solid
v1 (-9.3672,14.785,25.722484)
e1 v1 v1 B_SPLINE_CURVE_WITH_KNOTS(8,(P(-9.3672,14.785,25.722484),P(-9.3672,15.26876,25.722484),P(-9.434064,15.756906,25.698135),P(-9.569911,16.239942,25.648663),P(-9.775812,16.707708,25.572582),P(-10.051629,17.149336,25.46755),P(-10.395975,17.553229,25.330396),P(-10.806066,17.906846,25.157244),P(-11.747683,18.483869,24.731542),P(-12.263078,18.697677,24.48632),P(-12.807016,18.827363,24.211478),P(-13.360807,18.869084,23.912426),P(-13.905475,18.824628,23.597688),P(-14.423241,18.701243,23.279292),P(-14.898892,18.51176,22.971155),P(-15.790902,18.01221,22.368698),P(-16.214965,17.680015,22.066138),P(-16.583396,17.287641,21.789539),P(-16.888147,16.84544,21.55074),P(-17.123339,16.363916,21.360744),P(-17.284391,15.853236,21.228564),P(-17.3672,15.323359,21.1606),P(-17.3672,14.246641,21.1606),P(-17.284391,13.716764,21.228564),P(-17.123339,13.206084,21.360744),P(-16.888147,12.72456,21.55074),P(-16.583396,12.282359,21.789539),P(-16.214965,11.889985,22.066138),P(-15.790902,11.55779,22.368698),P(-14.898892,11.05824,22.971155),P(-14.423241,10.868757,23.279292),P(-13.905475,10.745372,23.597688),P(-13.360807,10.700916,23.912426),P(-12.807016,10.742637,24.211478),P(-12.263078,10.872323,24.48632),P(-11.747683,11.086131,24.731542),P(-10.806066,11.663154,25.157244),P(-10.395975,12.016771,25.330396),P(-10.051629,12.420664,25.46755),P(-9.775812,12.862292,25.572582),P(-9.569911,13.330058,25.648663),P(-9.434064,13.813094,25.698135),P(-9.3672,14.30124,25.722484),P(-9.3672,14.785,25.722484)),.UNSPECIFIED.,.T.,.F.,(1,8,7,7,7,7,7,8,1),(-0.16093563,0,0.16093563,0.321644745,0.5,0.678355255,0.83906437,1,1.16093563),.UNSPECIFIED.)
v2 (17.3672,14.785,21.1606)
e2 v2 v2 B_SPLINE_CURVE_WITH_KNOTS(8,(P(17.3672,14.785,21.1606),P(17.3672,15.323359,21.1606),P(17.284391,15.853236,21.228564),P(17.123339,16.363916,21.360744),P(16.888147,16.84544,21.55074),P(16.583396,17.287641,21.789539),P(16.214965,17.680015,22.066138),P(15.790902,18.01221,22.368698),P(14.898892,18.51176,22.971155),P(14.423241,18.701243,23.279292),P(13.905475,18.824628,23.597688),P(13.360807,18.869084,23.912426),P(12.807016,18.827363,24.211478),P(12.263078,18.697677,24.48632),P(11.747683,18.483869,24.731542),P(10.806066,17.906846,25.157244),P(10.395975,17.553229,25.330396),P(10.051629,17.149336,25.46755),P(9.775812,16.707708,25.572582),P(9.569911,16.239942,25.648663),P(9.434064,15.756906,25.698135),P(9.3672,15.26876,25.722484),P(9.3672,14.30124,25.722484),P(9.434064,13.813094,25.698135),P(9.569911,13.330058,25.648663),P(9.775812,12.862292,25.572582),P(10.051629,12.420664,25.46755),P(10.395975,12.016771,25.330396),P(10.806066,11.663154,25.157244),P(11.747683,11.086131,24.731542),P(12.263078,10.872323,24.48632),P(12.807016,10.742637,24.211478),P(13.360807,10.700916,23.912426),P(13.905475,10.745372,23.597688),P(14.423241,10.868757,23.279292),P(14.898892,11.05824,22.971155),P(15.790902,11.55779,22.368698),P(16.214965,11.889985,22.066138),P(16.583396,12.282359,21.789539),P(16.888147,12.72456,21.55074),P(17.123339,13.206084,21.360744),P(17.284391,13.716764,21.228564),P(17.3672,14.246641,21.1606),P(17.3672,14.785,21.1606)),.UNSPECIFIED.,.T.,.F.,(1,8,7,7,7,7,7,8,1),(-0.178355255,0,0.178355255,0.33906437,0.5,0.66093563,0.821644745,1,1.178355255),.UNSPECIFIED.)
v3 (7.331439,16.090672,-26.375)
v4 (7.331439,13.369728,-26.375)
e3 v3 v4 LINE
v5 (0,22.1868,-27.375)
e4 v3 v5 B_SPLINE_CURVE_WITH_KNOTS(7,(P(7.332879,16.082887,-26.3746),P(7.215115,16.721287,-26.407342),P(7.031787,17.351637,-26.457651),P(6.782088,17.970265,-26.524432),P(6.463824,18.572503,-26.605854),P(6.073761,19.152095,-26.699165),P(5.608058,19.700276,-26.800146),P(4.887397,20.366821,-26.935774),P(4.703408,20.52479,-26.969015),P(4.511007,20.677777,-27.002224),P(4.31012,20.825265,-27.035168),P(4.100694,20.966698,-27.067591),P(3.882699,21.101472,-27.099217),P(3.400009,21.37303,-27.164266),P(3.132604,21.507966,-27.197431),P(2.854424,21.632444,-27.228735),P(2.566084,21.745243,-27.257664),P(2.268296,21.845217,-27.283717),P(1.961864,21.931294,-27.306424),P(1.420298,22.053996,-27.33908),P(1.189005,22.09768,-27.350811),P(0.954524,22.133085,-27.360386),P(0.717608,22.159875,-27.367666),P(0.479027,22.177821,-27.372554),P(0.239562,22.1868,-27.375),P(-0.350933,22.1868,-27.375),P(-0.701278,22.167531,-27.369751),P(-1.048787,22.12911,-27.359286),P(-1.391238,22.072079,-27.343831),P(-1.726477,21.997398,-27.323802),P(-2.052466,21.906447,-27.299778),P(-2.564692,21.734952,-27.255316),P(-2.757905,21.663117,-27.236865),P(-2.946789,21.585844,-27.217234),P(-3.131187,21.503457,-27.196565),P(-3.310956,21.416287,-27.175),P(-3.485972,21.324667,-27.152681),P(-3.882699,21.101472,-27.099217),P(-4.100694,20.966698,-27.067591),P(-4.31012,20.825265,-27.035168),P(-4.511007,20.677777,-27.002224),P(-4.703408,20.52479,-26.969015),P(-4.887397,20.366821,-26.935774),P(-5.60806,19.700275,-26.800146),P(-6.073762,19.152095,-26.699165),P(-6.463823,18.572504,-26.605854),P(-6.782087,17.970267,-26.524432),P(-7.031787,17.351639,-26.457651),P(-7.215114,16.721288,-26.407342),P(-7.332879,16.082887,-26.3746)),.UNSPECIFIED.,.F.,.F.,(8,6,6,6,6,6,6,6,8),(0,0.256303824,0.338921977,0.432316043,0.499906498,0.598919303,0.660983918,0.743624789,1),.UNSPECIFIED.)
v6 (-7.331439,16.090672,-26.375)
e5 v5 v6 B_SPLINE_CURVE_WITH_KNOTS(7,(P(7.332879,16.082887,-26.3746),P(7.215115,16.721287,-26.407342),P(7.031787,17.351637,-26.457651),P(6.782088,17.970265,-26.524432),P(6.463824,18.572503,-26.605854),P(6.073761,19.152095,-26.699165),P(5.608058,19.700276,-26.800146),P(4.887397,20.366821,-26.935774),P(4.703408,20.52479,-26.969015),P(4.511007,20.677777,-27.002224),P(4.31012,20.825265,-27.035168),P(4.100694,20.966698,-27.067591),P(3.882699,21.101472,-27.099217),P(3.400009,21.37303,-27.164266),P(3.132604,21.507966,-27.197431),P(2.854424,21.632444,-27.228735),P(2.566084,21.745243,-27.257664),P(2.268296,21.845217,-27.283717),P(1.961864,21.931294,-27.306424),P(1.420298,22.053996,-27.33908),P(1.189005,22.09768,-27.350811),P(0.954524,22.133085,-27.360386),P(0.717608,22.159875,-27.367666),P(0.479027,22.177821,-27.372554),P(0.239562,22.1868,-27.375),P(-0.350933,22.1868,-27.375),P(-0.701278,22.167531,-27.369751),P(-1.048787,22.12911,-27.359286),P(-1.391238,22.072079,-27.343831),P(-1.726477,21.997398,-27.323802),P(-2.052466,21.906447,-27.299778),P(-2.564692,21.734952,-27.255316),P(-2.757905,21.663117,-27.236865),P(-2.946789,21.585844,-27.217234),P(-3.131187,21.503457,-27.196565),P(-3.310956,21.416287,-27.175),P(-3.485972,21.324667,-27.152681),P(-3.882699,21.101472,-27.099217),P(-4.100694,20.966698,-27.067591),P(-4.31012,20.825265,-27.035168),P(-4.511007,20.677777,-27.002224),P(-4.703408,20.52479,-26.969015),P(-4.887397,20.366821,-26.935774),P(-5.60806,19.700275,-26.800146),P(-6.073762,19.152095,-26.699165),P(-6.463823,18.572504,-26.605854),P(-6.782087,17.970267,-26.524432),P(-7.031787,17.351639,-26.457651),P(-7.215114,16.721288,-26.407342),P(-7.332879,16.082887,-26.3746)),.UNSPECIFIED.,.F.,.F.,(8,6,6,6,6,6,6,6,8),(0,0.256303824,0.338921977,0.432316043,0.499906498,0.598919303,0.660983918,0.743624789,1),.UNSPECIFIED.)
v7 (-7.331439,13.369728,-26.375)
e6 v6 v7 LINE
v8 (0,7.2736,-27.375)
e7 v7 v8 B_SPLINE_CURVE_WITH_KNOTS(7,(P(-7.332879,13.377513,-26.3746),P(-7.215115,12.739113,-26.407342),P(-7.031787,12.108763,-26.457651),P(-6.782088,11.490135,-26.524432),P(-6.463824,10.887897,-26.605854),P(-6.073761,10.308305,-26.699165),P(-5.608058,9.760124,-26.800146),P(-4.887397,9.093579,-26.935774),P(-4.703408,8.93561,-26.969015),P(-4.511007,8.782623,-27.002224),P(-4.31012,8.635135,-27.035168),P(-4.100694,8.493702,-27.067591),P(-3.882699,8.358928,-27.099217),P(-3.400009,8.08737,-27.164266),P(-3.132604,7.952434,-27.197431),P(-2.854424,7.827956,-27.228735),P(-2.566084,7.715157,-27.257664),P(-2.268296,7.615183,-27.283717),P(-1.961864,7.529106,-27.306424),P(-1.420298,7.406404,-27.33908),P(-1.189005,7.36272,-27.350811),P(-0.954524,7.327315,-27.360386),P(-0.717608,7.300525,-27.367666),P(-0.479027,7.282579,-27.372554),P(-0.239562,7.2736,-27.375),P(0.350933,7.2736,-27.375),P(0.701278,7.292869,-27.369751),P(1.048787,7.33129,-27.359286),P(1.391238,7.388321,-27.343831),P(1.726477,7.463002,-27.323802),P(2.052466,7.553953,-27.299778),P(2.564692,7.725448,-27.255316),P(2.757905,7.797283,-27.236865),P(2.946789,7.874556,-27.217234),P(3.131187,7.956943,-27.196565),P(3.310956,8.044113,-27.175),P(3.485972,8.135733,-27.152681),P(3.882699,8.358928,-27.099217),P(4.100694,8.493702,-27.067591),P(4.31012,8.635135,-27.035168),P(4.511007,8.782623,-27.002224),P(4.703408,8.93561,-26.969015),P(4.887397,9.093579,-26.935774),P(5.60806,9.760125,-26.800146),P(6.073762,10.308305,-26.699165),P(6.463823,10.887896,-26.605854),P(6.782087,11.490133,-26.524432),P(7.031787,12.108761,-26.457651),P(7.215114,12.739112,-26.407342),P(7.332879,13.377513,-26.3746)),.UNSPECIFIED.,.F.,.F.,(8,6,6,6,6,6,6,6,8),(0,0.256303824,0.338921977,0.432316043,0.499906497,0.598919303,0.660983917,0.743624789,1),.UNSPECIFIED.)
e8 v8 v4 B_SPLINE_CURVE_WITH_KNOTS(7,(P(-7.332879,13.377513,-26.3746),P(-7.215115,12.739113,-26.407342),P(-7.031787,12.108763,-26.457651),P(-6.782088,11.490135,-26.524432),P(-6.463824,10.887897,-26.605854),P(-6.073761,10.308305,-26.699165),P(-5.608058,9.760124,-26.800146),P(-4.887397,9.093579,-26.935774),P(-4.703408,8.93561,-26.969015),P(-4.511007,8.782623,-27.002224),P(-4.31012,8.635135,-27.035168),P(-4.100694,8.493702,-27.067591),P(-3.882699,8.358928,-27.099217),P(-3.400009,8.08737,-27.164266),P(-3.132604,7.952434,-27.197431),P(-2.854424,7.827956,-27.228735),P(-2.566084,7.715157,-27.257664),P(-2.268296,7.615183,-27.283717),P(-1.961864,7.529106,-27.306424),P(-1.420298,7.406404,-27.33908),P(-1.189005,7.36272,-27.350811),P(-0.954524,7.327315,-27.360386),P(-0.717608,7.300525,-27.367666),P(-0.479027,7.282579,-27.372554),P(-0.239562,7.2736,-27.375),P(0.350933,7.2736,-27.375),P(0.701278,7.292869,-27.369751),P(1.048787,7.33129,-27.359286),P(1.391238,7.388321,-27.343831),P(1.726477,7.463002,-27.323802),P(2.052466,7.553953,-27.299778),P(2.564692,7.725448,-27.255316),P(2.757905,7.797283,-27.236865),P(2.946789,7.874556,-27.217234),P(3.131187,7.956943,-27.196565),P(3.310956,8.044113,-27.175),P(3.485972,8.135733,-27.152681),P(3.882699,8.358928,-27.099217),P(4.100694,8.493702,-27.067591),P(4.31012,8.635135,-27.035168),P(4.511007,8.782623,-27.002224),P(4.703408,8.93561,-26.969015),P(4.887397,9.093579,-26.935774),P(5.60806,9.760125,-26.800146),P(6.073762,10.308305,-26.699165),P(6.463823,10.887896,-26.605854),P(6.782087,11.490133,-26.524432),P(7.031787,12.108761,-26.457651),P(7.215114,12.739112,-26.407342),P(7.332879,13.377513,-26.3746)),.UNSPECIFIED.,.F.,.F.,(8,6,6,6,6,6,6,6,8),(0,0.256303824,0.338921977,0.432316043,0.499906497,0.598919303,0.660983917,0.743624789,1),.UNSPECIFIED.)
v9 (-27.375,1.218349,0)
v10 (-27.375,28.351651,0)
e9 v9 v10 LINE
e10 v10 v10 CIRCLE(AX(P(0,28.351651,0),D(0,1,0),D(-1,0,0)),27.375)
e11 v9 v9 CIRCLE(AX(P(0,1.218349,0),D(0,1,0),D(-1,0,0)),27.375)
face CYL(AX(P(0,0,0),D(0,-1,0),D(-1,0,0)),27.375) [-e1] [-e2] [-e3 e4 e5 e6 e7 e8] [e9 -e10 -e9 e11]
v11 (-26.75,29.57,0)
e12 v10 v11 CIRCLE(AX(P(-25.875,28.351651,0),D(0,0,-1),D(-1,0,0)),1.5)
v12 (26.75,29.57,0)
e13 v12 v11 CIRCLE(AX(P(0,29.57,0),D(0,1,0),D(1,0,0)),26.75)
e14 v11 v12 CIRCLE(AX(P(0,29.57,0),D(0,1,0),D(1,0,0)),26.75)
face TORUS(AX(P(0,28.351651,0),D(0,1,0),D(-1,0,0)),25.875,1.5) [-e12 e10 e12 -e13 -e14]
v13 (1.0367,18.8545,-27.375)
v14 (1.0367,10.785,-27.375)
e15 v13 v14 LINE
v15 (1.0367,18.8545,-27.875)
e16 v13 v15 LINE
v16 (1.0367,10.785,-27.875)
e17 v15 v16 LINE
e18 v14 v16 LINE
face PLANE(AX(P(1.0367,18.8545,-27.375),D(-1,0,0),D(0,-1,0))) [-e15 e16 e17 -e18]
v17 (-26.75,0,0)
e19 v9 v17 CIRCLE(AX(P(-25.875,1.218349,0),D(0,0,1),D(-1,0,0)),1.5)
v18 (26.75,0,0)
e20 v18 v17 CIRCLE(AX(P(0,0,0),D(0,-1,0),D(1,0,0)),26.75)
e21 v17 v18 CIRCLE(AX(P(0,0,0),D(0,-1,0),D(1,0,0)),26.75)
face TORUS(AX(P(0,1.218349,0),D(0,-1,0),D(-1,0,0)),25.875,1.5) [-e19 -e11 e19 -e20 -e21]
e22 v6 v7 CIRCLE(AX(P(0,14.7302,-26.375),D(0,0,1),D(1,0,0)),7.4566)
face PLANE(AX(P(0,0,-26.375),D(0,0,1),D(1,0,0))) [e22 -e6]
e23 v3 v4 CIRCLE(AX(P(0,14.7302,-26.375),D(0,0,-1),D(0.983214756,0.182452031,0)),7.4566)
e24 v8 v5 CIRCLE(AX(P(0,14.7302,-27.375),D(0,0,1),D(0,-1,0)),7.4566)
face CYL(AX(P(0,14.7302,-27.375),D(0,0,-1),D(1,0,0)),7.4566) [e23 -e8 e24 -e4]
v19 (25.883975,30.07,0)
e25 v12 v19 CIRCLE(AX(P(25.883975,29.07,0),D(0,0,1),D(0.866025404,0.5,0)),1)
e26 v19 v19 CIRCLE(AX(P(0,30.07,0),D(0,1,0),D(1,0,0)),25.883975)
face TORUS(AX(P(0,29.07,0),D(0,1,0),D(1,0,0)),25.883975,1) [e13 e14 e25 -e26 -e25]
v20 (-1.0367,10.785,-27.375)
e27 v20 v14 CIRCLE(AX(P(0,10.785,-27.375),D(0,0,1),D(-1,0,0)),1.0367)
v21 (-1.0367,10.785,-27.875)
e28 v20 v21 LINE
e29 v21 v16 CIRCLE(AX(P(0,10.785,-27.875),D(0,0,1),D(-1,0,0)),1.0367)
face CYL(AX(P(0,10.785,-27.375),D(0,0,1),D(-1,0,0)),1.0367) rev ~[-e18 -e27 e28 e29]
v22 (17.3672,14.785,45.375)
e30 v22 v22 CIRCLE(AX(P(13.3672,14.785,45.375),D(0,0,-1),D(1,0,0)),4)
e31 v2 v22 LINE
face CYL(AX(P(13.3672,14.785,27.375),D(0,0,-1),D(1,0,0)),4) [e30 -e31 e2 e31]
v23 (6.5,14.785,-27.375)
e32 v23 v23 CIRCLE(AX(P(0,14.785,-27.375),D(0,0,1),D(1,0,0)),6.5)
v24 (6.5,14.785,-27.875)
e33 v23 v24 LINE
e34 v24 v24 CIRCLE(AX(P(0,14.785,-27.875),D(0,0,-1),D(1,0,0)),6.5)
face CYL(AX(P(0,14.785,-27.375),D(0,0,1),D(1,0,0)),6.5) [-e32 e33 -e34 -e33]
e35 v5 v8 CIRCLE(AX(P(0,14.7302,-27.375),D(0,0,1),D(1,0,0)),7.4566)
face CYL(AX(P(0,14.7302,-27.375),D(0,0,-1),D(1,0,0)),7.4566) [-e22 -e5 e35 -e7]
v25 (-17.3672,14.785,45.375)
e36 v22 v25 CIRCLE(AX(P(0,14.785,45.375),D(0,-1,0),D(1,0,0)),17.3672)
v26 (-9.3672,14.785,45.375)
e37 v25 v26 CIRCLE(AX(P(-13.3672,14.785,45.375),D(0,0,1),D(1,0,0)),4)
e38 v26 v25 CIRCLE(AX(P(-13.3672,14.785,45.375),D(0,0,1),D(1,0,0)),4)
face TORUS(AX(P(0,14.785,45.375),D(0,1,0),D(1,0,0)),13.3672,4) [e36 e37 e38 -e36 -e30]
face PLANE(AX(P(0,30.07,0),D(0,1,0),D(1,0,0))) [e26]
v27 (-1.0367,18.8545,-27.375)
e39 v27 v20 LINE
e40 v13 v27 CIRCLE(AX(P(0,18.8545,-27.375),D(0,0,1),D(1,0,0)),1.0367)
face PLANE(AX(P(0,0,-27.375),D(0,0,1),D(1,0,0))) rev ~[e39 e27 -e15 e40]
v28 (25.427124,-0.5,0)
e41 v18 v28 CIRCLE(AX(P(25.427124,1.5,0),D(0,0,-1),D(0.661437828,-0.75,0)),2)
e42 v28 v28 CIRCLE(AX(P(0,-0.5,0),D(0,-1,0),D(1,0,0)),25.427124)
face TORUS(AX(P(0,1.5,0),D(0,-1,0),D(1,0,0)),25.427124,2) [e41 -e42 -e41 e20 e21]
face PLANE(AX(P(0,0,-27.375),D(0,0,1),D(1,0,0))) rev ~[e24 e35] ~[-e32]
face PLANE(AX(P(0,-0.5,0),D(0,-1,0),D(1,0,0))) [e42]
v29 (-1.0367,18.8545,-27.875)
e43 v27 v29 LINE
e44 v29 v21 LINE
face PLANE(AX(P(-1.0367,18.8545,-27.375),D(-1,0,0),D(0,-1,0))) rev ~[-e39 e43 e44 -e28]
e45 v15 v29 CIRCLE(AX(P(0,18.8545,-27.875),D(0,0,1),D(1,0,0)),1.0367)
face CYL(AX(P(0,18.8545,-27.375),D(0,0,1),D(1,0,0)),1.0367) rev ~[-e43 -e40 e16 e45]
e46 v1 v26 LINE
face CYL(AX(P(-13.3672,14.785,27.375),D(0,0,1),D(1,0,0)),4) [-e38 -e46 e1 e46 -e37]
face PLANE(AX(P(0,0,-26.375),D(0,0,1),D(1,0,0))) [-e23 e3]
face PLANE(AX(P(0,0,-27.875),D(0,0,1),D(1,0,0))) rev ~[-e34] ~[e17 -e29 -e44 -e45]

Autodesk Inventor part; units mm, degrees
ref_plane "YZ Plane" through (0, 0, 0) normal (1, 0, 0) x (0, 1, 0)
sketch "Sketch1" plane through (0, 0, 0) normal (0, 1, 0) x (-1, 0, 0)
  circle A0 centre (0, 0) radius 27.375
  dimension "d0" = 54.75
extrude "Extrusion1" add sketch "Sketch1" along normal blind 29.57
sketch "Sketch2" plane through (0, 29.57, 0) normal (0, 1, 0) x (1, 0, 0)
  point P0 (0, 0)
ref_plane "Work Plane1" through (0, 0, 27.375) normal (0, 0, 1) x (1, 0, 0)
sketch "Sketch3" plane through (0, 0, 27.375) normal (0, 0, 1) x (1, 0, 0)
  line L0 (-27.375, 0) -> (27.375, 0) construction
  line L1 (27.375, 0) -> (27.375, 29.57) construction
  line L2 (27.375, 0) -> (27.375, 29.57) construction
  line L3 (27.375, 29.57) -> (-27.375, 29.57) construction
  line L4 (-17.35, 14.785) -> (17.35, 14.785)
  circle A0 centre (13.3672, 14.785) radius 4
  line L5 (0, 0) -> (0, 29.57) construction
  circle A1 centre (-13.3672, 14.785) radius 4
  point P0 (0, 0)
  point P1 (0, 14.785)
  dimension "d3" = 34.7
  dimension "d4" = 8
extrude "Extrusion2" add sketch "Sketch3" against normal blind 10 and the other way blind 18
sketch "Sketch4" plane through (13.3672, 14.785, 45.375) normal (0, 0, 1) x (1, 0, 0)
  line L0 (-13.3672, -26.0897) -> (-13.3672, 22.3589)
  point P0 (-13.3672, -14.785)
sketch "Sketch5" plane through (13.3672, 14.785, 45.375) normal (0, 0, 1) x (1, 0, 0)
  circle A0 centre (0, 0) radius 4
  line L0 (-13.3672, 32.0486) -> (-13.3672, -35.7794) projected
  point P0 (-13.3672, -14.785)
  dimension "d9" = 8
revolve "Revolution1" add sketch "Sketch5" angle 180 about axis through (0, 37.1439, 45.375) along (0, -1, 0)
sketch "Sketch8" plane through (0, 0, 0) normal (0, -1, 0) x (1, 0, 0)
  circle A0 centre (0, 0) radius 26.75
  dimension "d11" = 53.5
sketch "Sketch9" plane through (0, 29.57, 0) normal (0, 1, 0) x (1, 0, 0)
  circle A0 centre (0, 0) radius 26.75
  dimension "d12" = 53.5
extrude "Extrusion3" add sketch "Sketch9" along normal blind 0.5
extrude "Extrusion4" add sketch "Sketch8" along normal blind 0.5
fillet "Fillet1" radius 2 1 edges at (-26.75, -0.5, 0)
fillet "Fillet2" radius 1.5 1 edges at (27.375, 0, 0)
fillet "Fillet3" radius 1.5 1 edges at (27.375, 29.57, 0)
fillet "Fillet4" radius 1 1 edges at (-26.75, 30.07, 0)
ref_plane "Work Plane2" through (0, 0, -27.375) normal (0, 0, 1) x (1, 0, 0)
sketch "Sketch10" plane through (0, 0, -27.375) normal (0, 0, 1) x (1, 0, 0)
  line L0 (27.375, 28.3517) -> (-27.375, 28.3517) construction
  line L1 (27.3423, 28.3517) -> (-27.3423, 28.3517) construction
  line L2 (27.375, 28.3517) -> (27.375, 1.2183) construction
  line L3 (-27.375, 1.2183) -> (27.375, 1.2183) construction
  line L4 (27.375, 1.2183) -> (27.375, 28.3517) construction
  circle A0 centre (0, 14.785) radius 7.5
  circle A1 centre (0, 14.785) radius 6.5
  line L5 (1.0367, 18.8545) -> (1.0367, 10.785)
  line L6 (-13.3672, 10.785) -> (13.3672, 10.785) projected
  line L7 (0, 28.3517) -> (0, 1.2183) construction
  line L8 (-1.0367, 18.8545) -> (-1.0367, 10.785)
  arc A2 (1.0367, 18.8545) -> (-1.0367, 18.8545) centre (0, 18.8545) ccw construction
  arc A3 (-1.0367, 10.785) -> (1.0367, 10.785) centre (0, 10.785) ccw construction
  arc A4 (1.0367, 18.8545) -> (-1.0367, 18.8545) centre (0, 18.8545) ccw
  arc A5 (-1.0367, 10.785) -> (1.0367, 10.785) centre (0, 10.785) ccw
  point P0 (0, 0)
  point P1 (0, 14.785)
  point P2 (27.375, 14.785)
  dimension "d21" = 15
  dimension "d22" = 13
extrude "Extrusion5" add sketch "Sketch10" against normal blind 0.5 contours L6 A5 A1 | A1 L6 L5 A4 L8
sketch "Sketch11" plane through (0, 0, -27.375) normal (0, 0, 1) x (1, 0, 0)
  circle A0 centre (0, 14.7302) radius 7.4566
  point P0 (0, 0)
extrude "Extrusion6" add sketch "Sketch11" along normal blind 1
properties part number "Noke"
